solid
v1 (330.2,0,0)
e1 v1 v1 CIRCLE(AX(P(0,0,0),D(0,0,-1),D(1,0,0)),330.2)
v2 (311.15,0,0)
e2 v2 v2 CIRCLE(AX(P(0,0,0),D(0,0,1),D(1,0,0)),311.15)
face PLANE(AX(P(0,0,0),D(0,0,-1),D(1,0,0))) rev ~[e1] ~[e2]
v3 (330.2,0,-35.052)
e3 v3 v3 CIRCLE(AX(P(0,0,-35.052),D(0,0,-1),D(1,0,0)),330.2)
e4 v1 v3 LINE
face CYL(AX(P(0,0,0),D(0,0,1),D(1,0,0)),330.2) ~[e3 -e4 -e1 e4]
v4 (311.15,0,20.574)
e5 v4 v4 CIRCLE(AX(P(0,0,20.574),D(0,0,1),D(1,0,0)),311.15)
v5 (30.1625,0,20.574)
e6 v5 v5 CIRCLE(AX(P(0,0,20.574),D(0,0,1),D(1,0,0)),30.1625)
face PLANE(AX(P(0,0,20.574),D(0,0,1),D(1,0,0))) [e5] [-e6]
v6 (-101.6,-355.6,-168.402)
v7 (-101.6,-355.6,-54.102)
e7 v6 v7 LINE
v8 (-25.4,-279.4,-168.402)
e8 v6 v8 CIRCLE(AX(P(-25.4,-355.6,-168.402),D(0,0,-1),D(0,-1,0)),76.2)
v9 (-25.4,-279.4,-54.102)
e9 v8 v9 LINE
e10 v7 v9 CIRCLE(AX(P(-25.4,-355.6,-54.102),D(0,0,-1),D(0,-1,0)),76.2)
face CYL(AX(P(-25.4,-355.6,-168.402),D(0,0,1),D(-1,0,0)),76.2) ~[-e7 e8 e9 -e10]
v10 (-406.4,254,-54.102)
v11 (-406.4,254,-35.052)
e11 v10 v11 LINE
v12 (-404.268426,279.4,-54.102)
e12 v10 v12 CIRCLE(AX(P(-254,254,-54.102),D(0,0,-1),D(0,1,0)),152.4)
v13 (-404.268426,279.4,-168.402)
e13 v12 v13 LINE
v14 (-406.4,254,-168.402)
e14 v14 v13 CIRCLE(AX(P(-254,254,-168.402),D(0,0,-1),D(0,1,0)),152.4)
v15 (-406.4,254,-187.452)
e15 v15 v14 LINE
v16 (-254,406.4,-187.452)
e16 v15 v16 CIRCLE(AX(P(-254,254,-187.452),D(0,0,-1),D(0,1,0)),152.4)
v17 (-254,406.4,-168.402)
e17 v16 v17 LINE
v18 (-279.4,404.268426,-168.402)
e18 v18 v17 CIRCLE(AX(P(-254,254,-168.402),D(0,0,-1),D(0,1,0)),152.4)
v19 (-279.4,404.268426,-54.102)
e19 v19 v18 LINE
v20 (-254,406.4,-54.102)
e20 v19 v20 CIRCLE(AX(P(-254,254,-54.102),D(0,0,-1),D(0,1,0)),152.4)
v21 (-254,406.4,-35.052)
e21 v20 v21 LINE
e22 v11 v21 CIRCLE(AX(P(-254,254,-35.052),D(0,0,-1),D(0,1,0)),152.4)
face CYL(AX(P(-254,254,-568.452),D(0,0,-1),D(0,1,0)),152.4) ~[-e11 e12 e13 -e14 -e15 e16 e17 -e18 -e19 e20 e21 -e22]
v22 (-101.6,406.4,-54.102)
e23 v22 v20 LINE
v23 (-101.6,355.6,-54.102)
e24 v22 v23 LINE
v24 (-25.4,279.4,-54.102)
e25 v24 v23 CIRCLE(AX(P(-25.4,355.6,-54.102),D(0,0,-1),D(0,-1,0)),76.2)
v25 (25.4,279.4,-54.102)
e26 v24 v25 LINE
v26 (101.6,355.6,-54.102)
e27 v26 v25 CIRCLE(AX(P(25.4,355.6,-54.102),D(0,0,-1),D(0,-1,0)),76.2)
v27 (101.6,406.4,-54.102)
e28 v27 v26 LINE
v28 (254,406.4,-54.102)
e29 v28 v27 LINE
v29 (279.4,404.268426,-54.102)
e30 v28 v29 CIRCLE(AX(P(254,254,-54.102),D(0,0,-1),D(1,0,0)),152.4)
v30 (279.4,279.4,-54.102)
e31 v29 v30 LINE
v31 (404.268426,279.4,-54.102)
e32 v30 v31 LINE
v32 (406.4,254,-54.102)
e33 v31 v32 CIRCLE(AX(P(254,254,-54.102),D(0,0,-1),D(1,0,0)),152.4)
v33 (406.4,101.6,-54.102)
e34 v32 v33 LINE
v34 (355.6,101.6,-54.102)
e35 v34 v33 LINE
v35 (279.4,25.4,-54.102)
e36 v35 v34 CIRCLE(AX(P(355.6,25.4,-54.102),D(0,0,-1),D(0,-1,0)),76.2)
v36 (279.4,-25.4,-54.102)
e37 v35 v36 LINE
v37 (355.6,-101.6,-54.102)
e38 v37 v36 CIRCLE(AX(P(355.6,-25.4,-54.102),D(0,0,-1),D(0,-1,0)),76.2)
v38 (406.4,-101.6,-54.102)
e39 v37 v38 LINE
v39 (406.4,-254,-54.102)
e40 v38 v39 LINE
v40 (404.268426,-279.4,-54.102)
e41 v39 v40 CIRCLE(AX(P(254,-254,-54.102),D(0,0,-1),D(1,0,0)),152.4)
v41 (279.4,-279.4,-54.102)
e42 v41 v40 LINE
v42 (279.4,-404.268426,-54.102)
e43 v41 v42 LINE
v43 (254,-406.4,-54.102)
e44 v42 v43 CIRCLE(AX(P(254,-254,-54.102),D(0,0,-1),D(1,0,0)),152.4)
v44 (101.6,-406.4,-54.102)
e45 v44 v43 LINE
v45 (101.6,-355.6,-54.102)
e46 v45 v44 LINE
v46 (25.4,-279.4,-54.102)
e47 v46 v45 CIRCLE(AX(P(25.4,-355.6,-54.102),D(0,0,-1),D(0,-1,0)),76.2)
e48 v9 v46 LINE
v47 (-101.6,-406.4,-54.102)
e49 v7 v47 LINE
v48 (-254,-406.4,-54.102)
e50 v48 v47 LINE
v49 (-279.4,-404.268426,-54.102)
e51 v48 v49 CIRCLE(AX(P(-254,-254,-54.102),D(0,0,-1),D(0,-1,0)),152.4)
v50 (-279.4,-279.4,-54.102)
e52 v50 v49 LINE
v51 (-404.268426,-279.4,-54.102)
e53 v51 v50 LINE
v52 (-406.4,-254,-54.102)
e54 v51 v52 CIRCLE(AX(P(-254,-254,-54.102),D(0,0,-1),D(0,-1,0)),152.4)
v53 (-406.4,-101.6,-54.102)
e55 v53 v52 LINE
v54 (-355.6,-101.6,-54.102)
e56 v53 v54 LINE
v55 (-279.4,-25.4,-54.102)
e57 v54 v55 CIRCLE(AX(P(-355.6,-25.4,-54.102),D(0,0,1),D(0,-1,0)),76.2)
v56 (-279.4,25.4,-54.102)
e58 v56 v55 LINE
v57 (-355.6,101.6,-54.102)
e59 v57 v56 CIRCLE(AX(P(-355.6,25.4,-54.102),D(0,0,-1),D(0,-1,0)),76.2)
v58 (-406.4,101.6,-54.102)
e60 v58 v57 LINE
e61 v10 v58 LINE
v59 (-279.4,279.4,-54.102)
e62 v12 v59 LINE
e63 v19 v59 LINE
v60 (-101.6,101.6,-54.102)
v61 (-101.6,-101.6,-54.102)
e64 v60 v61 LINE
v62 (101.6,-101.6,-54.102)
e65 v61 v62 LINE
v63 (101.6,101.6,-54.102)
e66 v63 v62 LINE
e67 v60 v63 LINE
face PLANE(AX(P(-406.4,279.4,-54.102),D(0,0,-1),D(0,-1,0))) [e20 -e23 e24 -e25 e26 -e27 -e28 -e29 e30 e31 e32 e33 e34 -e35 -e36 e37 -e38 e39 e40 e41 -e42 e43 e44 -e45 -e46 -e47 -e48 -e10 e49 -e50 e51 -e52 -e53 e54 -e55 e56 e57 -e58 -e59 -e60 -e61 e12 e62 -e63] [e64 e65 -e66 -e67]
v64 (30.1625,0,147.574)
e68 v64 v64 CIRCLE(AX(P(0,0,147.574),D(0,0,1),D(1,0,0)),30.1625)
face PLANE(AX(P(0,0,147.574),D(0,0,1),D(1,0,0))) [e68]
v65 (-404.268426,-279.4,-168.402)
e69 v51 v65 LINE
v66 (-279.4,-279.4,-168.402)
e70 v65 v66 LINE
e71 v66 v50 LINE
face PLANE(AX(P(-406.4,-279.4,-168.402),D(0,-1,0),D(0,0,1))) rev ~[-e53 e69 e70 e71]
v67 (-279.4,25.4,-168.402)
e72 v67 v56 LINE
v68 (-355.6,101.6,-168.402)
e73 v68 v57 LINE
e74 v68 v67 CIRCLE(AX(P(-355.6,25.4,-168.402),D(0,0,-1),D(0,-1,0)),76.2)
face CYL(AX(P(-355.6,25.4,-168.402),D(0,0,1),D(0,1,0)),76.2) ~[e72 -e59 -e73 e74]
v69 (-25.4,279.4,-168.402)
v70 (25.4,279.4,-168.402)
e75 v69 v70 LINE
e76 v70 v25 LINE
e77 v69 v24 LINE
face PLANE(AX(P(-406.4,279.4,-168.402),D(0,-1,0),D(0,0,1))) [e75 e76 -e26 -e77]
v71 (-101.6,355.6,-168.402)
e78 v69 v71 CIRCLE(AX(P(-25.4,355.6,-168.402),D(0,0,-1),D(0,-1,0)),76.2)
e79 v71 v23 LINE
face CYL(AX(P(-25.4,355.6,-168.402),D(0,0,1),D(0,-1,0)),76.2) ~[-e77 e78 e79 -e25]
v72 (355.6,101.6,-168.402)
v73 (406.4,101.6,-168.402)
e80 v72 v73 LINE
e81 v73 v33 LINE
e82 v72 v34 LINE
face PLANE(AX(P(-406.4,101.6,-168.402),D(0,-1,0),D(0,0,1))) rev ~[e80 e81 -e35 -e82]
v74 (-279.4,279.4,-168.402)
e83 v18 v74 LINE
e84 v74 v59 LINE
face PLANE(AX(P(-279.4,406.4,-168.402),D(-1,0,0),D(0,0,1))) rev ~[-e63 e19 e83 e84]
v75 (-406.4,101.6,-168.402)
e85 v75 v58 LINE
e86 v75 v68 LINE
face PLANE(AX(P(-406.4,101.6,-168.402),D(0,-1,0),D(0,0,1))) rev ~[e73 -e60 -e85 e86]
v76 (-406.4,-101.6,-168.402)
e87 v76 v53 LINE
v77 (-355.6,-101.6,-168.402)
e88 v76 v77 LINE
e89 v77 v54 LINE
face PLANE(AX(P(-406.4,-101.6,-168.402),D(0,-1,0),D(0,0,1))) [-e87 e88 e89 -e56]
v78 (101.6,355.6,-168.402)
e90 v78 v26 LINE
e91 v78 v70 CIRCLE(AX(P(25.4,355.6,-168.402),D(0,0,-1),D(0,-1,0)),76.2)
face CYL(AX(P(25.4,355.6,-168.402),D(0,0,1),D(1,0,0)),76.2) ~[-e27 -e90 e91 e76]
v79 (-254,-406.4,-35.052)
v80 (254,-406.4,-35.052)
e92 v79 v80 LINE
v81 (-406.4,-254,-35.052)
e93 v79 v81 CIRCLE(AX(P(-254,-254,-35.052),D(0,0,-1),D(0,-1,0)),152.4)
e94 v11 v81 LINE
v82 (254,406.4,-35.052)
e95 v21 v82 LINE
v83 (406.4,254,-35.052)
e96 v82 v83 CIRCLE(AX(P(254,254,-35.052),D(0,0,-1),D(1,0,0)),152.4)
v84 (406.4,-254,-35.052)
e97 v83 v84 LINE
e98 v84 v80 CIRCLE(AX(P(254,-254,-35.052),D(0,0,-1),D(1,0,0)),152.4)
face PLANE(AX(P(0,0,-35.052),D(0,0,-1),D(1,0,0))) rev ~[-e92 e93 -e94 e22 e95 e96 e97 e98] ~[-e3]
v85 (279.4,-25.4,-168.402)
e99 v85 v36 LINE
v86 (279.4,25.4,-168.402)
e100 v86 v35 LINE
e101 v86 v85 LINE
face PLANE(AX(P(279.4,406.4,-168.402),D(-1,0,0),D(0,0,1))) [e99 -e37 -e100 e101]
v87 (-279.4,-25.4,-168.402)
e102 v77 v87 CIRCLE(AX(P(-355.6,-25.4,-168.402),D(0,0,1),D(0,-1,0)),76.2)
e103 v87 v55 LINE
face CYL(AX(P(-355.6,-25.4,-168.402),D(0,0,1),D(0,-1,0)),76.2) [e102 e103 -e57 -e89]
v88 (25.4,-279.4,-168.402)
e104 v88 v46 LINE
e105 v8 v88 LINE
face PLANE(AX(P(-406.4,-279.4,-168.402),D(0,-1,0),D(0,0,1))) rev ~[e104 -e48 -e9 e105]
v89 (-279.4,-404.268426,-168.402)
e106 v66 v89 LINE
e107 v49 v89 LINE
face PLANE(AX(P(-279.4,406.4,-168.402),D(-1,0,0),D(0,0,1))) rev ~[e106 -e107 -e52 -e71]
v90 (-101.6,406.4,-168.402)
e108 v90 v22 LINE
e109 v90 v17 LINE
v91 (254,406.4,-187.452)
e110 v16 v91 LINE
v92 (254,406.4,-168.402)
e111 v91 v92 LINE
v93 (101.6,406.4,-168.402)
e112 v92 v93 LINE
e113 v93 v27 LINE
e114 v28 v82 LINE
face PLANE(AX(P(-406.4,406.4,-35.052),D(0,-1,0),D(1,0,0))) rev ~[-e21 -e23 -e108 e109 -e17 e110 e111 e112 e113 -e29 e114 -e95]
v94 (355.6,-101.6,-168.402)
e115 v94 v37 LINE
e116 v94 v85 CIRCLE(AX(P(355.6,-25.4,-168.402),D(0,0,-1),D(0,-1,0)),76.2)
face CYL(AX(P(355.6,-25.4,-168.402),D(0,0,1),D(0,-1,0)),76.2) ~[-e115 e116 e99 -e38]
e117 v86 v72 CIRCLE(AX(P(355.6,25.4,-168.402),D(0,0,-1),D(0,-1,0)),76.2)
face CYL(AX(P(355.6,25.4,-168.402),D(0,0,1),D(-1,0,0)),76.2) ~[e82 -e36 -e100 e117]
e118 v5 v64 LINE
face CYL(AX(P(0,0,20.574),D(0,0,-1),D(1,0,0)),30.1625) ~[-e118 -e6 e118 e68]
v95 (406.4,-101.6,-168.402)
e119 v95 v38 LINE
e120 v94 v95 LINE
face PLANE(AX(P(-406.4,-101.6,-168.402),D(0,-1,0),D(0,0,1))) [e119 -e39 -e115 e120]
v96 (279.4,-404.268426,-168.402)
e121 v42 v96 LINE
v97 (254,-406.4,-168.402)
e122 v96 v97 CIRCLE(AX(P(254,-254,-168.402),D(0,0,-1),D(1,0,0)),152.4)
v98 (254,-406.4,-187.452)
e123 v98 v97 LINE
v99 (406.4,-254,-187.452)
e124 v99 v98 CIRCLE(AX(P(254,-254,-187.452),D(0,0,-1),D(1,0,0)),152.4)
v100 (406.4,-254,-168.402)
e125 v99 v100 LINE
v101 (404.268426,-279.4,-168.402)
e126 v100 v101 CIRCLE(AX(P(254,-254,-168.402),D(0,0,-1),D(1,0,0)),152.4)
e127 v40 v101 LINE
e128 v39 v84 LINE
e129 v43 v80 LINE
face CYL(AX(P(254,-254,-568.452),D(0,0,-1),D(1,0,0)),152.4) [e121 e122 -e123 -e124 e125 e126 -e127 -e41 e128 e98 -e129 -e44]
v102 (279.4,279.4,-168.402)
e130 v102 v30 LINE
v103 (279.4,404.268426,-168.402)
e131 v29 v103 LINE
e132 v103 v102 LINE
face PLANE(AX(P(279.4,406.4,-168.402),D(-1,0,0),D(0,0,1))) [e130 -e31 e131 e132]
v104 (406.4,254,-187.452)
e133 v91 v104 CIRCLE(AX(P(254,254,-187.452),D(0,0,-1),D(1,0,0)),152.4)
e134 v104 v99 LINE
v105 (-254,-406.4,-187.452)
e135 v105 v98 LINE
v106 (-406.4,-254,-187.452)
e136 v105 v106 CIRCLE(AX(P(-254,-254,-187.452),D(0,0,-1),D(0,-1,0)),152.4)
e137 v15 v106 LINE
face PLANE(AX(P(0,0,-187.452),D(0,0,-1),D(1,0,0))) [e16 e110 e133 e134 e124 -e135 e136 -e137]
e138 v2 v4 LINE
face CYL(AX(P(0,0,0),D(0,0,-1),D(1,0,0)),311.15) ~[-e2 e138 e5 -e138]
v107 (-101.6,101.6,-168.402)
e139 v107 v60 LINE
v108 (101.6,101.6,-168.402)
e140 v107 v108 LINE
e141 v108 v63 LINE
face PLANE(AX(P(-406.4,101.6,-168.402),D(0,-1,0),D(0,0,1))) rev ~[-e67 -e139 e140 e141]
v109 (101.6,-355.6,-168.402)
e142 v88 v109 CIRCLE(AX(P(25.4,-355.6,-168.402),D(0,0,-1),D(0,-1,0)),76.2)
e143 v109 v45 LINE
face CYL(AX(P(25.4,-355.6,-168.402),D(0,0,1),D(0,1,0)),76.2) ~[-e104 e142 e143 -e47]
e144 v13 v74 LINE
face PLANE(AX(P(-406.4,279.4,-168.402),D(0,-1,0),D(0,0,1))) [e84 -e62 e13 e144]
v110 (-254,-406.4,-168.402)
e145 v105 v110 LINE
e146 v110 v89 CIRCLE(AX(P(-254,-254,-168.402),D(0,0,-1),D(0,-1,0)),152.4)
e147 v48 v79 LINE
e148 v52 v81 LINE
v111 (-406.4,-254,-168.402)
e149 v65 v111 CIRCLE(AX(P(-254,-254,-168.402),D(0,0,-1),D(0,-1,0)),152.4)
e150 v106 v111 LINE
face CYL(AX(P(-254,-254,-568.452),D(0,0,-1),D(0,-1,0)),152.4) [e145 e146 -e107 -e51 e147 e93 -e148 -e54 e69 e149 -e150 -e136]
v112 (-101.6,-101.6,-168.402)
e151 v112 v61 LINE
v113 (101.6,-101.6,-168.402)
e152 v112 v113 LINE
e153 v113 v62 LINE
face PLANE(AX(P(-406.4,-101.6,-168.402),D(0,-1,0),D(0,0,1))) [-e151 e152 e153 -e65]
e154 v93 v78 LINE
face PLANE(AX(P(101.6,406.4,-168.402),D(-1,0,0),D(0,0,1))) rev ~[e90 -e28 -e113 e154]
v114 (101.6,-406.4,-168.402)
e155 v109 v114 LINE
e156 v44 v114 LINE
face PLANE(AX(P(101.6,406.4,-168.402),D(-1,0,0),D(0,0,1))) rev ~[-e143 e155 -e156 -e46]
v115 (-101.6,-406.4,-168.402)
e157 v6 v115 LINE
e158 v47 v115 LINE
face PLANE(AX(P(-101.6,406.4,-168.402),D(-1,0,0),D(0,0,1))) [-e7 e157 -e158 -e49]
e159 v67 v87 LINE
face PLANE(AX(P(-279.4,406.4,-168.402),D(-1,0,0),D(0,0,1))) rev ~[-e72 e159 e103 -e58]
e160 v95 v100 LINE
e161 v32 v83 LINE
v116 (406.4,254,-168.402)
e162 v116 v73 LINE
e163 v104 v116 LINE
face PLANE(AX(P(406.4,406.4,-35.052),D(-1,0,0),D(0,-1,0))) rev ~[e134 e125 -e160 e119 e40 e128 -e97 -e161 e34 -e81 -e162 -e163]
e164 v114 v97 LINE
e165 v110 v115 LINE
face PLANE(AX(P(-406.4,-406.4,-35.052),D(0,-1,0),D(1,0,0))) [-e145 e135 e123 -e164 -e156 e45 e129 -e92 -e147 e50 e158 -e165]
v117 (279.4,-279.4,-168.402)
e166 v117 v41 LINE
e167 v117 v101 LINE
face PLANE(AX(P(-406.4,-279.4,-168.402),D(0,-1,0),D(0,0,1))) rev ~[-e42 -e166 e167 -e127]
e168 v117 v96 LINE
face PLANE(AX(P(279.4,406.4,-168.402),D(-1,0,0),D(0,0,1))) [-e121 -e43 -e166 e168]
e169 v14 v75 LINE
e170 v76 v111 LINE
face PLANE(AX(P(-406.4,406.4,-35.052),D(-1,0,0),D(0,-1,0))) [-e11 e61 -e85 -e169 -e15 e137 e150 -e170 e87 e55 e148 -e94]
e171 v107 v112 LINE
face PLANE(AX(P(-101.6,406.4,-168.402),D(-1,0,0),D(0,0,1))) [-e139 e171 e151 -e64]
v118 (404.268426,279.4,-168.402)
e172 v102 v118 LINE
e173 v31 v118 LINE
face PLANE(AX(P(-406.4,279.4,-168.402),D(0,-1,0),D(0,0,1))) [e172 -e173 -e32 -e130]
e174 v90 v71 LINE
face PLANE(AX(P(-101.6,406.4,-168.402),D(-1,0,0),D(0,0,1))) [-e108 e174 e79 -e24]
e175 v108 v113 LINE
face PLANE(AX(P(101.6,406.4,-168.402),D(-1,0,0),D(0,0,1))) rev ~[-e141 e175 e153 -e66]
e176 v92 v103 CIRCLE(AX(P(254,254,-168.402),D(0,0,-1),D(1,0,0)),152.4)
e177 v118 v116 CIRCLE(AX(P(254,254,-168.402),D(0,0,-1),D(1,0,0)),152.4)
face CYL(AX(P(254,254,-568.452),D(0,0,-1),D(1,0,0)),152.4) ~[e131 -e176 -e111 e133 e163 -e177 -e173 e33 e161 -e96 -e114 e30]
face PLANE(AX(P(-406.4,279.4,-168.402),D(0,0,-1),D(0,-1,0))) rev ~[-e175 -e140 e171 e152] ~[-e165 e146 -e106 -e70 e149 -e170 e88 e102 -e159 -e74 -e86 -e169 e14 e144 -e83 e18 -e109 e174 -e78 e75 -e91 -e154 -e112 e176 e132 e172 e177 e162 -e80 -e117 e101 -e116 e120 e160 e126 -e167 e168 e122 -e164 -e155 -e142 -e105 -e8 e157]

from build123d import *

# Parameters (mm, degrees)
F0_R         = 311.15
F1_DEPTH     = 20.574
F2_R         = 330.2
F3_DEPTH     = 35.052
F4_W         = 812.8
F4_H         = 812.8
F5_DEPTH     = 152.4
F6_W         = 177.8
F6_H         = 114.3
F7_DEPTH     = 812.801
F8_W         = 177.8
F8_H         = 114.3
F9_DEPTH     = 812.801
F10_T1_DEPTH = 914.4
F11_R        = 76.2
F12_R        = 30.1625
F13_DEPTH    = 127


# Not quite as in the source:
# - a fillet or chamfer that OpenCascade refuses, or shapes differently, is made with other operations: its cross-section is extruded or revolved along the edge and cut away or added


with BuildPart() as f1:
    # F0 (on Top) → F1 (new body)
    with BuildSketch(Plane.XY):
        Circle(F0_R)
    extrude(amount=F1_DEPTH)

    # F2 (on face) → F3 (join)
    with BuildSketch(Plane(origin=(0, 0, 0), x_dir=(1, 0, 0), z_dir=(0, 0, -1))):
        Circle(F2_R)
    extrude(amount=F3_DEPTH)

    # F4 (on face) → F5 (join)
    with BuildSketch(Plane(origin=(0, 0, -35.052), x_dir=(1, 0, 0), z_dir=(0, 0, -1))):
        Rectangle(F4_W, F4_H)
    extrude(amount=F5_DEPTH)

    # F6 (on face) → F7 (cut, through all)
    with BuildSketch(Plane(origin=(0, 406.4, 0), x_dir=(-1, 0, 0), z_dir=(0, 1, 0))):
        with Locations((190.5, -111.252)):
            Rectangle(F6_W, F6_H)
        with Locations((-190.5, -111.252)):
            Rectangle(F6_W, F6_H)
    extrude(amount=-F7_DEPTH, mode=Mode.SUBTRACT)

    # F8 (on face) → F9 (cut, through all)
    with BuildSketch(Plane(origin=(-406.4, 0, 0), x_dir=(0, -1, 0), z_dir=(-1, 0, 0))):
        with Locations((190.5, -111.252)):
            Rectangle(F8_W, F8_H)
        with Locations((-190.5, -111.252)):
            Rectangle(F8_W, F8_H)
    extrude(amount=-F9_DEPTH, mode=Mode.SUBTRACT)

    # F10: fillet of radius 152.4 on 4 edges, made by hand

    # F10_s2 → F10_t1 (cut)
    with BuildSketch(Plane.XY.offset(-568.452)):
        with BuildLine():
            ThreePointArc((-254, -406.4), (-361.7630734528, -361.7630734528), (-406.4, -254))
            Line((-406.4, -254), (-406.4, -406.4))
            Line((-406.4, -406.4), (-254, -406.4))
        make_face()
        with BuildLine():
            ThreePointArc((-254, 406.4), (-361.7630734528, 361.7630734528), (-406.4, 254))
            Line((-406.4, 254), (-406.4, 406.4))
            Line((-406.4, 406.4), (-254, 406.4))
        make_face()
        with BuildLine():
            ThreePointArc((406.4, 254), (361.7630734528, 361.7630734528), (254, 406.4))
            Line((254, 406.4), (406.4, 406.4))
            Line((406.4, 406.4), (406.4, 254))
        make_face()
        with BuildLine():
            ThreePointArc((406.4, -254), (361.7630734528, -361.7630734528), (254, -406.4))
            Line((254, -406.4), (406.4, -406.4))
            Line((406.4, -406.4), (406.4, -254))
        make_face()
    extrude(amount=F10_T1_DEPTH, mode=Mode.SUBTRACT)

    # F11
    f11_edges = [f1.edges().sort_by_distance(p)[0] for p in [
        (279.4, -101.6, -111.252),
        (279.4, 101.6, -111.252),
        (101.6, 279.4, -111.252),
        (-101.6, 279.4, -111.252),
        (-279.4, 101.6, -111.252),
        (-279.4, -101.6, -111.252),
        (-101.6, -279.4, -111.252),
        (101.6, -279.4, -111.252),
    ]]
    fillet(f11_edges, radius=F11_R)

    # F12 (on face) → F13 (join)
    with BuildSketch(Plane.XY.offset(20.574)):
        Circle(F12_R)
    extrude(amount=F13_DEPTH)


solid = f1.part
